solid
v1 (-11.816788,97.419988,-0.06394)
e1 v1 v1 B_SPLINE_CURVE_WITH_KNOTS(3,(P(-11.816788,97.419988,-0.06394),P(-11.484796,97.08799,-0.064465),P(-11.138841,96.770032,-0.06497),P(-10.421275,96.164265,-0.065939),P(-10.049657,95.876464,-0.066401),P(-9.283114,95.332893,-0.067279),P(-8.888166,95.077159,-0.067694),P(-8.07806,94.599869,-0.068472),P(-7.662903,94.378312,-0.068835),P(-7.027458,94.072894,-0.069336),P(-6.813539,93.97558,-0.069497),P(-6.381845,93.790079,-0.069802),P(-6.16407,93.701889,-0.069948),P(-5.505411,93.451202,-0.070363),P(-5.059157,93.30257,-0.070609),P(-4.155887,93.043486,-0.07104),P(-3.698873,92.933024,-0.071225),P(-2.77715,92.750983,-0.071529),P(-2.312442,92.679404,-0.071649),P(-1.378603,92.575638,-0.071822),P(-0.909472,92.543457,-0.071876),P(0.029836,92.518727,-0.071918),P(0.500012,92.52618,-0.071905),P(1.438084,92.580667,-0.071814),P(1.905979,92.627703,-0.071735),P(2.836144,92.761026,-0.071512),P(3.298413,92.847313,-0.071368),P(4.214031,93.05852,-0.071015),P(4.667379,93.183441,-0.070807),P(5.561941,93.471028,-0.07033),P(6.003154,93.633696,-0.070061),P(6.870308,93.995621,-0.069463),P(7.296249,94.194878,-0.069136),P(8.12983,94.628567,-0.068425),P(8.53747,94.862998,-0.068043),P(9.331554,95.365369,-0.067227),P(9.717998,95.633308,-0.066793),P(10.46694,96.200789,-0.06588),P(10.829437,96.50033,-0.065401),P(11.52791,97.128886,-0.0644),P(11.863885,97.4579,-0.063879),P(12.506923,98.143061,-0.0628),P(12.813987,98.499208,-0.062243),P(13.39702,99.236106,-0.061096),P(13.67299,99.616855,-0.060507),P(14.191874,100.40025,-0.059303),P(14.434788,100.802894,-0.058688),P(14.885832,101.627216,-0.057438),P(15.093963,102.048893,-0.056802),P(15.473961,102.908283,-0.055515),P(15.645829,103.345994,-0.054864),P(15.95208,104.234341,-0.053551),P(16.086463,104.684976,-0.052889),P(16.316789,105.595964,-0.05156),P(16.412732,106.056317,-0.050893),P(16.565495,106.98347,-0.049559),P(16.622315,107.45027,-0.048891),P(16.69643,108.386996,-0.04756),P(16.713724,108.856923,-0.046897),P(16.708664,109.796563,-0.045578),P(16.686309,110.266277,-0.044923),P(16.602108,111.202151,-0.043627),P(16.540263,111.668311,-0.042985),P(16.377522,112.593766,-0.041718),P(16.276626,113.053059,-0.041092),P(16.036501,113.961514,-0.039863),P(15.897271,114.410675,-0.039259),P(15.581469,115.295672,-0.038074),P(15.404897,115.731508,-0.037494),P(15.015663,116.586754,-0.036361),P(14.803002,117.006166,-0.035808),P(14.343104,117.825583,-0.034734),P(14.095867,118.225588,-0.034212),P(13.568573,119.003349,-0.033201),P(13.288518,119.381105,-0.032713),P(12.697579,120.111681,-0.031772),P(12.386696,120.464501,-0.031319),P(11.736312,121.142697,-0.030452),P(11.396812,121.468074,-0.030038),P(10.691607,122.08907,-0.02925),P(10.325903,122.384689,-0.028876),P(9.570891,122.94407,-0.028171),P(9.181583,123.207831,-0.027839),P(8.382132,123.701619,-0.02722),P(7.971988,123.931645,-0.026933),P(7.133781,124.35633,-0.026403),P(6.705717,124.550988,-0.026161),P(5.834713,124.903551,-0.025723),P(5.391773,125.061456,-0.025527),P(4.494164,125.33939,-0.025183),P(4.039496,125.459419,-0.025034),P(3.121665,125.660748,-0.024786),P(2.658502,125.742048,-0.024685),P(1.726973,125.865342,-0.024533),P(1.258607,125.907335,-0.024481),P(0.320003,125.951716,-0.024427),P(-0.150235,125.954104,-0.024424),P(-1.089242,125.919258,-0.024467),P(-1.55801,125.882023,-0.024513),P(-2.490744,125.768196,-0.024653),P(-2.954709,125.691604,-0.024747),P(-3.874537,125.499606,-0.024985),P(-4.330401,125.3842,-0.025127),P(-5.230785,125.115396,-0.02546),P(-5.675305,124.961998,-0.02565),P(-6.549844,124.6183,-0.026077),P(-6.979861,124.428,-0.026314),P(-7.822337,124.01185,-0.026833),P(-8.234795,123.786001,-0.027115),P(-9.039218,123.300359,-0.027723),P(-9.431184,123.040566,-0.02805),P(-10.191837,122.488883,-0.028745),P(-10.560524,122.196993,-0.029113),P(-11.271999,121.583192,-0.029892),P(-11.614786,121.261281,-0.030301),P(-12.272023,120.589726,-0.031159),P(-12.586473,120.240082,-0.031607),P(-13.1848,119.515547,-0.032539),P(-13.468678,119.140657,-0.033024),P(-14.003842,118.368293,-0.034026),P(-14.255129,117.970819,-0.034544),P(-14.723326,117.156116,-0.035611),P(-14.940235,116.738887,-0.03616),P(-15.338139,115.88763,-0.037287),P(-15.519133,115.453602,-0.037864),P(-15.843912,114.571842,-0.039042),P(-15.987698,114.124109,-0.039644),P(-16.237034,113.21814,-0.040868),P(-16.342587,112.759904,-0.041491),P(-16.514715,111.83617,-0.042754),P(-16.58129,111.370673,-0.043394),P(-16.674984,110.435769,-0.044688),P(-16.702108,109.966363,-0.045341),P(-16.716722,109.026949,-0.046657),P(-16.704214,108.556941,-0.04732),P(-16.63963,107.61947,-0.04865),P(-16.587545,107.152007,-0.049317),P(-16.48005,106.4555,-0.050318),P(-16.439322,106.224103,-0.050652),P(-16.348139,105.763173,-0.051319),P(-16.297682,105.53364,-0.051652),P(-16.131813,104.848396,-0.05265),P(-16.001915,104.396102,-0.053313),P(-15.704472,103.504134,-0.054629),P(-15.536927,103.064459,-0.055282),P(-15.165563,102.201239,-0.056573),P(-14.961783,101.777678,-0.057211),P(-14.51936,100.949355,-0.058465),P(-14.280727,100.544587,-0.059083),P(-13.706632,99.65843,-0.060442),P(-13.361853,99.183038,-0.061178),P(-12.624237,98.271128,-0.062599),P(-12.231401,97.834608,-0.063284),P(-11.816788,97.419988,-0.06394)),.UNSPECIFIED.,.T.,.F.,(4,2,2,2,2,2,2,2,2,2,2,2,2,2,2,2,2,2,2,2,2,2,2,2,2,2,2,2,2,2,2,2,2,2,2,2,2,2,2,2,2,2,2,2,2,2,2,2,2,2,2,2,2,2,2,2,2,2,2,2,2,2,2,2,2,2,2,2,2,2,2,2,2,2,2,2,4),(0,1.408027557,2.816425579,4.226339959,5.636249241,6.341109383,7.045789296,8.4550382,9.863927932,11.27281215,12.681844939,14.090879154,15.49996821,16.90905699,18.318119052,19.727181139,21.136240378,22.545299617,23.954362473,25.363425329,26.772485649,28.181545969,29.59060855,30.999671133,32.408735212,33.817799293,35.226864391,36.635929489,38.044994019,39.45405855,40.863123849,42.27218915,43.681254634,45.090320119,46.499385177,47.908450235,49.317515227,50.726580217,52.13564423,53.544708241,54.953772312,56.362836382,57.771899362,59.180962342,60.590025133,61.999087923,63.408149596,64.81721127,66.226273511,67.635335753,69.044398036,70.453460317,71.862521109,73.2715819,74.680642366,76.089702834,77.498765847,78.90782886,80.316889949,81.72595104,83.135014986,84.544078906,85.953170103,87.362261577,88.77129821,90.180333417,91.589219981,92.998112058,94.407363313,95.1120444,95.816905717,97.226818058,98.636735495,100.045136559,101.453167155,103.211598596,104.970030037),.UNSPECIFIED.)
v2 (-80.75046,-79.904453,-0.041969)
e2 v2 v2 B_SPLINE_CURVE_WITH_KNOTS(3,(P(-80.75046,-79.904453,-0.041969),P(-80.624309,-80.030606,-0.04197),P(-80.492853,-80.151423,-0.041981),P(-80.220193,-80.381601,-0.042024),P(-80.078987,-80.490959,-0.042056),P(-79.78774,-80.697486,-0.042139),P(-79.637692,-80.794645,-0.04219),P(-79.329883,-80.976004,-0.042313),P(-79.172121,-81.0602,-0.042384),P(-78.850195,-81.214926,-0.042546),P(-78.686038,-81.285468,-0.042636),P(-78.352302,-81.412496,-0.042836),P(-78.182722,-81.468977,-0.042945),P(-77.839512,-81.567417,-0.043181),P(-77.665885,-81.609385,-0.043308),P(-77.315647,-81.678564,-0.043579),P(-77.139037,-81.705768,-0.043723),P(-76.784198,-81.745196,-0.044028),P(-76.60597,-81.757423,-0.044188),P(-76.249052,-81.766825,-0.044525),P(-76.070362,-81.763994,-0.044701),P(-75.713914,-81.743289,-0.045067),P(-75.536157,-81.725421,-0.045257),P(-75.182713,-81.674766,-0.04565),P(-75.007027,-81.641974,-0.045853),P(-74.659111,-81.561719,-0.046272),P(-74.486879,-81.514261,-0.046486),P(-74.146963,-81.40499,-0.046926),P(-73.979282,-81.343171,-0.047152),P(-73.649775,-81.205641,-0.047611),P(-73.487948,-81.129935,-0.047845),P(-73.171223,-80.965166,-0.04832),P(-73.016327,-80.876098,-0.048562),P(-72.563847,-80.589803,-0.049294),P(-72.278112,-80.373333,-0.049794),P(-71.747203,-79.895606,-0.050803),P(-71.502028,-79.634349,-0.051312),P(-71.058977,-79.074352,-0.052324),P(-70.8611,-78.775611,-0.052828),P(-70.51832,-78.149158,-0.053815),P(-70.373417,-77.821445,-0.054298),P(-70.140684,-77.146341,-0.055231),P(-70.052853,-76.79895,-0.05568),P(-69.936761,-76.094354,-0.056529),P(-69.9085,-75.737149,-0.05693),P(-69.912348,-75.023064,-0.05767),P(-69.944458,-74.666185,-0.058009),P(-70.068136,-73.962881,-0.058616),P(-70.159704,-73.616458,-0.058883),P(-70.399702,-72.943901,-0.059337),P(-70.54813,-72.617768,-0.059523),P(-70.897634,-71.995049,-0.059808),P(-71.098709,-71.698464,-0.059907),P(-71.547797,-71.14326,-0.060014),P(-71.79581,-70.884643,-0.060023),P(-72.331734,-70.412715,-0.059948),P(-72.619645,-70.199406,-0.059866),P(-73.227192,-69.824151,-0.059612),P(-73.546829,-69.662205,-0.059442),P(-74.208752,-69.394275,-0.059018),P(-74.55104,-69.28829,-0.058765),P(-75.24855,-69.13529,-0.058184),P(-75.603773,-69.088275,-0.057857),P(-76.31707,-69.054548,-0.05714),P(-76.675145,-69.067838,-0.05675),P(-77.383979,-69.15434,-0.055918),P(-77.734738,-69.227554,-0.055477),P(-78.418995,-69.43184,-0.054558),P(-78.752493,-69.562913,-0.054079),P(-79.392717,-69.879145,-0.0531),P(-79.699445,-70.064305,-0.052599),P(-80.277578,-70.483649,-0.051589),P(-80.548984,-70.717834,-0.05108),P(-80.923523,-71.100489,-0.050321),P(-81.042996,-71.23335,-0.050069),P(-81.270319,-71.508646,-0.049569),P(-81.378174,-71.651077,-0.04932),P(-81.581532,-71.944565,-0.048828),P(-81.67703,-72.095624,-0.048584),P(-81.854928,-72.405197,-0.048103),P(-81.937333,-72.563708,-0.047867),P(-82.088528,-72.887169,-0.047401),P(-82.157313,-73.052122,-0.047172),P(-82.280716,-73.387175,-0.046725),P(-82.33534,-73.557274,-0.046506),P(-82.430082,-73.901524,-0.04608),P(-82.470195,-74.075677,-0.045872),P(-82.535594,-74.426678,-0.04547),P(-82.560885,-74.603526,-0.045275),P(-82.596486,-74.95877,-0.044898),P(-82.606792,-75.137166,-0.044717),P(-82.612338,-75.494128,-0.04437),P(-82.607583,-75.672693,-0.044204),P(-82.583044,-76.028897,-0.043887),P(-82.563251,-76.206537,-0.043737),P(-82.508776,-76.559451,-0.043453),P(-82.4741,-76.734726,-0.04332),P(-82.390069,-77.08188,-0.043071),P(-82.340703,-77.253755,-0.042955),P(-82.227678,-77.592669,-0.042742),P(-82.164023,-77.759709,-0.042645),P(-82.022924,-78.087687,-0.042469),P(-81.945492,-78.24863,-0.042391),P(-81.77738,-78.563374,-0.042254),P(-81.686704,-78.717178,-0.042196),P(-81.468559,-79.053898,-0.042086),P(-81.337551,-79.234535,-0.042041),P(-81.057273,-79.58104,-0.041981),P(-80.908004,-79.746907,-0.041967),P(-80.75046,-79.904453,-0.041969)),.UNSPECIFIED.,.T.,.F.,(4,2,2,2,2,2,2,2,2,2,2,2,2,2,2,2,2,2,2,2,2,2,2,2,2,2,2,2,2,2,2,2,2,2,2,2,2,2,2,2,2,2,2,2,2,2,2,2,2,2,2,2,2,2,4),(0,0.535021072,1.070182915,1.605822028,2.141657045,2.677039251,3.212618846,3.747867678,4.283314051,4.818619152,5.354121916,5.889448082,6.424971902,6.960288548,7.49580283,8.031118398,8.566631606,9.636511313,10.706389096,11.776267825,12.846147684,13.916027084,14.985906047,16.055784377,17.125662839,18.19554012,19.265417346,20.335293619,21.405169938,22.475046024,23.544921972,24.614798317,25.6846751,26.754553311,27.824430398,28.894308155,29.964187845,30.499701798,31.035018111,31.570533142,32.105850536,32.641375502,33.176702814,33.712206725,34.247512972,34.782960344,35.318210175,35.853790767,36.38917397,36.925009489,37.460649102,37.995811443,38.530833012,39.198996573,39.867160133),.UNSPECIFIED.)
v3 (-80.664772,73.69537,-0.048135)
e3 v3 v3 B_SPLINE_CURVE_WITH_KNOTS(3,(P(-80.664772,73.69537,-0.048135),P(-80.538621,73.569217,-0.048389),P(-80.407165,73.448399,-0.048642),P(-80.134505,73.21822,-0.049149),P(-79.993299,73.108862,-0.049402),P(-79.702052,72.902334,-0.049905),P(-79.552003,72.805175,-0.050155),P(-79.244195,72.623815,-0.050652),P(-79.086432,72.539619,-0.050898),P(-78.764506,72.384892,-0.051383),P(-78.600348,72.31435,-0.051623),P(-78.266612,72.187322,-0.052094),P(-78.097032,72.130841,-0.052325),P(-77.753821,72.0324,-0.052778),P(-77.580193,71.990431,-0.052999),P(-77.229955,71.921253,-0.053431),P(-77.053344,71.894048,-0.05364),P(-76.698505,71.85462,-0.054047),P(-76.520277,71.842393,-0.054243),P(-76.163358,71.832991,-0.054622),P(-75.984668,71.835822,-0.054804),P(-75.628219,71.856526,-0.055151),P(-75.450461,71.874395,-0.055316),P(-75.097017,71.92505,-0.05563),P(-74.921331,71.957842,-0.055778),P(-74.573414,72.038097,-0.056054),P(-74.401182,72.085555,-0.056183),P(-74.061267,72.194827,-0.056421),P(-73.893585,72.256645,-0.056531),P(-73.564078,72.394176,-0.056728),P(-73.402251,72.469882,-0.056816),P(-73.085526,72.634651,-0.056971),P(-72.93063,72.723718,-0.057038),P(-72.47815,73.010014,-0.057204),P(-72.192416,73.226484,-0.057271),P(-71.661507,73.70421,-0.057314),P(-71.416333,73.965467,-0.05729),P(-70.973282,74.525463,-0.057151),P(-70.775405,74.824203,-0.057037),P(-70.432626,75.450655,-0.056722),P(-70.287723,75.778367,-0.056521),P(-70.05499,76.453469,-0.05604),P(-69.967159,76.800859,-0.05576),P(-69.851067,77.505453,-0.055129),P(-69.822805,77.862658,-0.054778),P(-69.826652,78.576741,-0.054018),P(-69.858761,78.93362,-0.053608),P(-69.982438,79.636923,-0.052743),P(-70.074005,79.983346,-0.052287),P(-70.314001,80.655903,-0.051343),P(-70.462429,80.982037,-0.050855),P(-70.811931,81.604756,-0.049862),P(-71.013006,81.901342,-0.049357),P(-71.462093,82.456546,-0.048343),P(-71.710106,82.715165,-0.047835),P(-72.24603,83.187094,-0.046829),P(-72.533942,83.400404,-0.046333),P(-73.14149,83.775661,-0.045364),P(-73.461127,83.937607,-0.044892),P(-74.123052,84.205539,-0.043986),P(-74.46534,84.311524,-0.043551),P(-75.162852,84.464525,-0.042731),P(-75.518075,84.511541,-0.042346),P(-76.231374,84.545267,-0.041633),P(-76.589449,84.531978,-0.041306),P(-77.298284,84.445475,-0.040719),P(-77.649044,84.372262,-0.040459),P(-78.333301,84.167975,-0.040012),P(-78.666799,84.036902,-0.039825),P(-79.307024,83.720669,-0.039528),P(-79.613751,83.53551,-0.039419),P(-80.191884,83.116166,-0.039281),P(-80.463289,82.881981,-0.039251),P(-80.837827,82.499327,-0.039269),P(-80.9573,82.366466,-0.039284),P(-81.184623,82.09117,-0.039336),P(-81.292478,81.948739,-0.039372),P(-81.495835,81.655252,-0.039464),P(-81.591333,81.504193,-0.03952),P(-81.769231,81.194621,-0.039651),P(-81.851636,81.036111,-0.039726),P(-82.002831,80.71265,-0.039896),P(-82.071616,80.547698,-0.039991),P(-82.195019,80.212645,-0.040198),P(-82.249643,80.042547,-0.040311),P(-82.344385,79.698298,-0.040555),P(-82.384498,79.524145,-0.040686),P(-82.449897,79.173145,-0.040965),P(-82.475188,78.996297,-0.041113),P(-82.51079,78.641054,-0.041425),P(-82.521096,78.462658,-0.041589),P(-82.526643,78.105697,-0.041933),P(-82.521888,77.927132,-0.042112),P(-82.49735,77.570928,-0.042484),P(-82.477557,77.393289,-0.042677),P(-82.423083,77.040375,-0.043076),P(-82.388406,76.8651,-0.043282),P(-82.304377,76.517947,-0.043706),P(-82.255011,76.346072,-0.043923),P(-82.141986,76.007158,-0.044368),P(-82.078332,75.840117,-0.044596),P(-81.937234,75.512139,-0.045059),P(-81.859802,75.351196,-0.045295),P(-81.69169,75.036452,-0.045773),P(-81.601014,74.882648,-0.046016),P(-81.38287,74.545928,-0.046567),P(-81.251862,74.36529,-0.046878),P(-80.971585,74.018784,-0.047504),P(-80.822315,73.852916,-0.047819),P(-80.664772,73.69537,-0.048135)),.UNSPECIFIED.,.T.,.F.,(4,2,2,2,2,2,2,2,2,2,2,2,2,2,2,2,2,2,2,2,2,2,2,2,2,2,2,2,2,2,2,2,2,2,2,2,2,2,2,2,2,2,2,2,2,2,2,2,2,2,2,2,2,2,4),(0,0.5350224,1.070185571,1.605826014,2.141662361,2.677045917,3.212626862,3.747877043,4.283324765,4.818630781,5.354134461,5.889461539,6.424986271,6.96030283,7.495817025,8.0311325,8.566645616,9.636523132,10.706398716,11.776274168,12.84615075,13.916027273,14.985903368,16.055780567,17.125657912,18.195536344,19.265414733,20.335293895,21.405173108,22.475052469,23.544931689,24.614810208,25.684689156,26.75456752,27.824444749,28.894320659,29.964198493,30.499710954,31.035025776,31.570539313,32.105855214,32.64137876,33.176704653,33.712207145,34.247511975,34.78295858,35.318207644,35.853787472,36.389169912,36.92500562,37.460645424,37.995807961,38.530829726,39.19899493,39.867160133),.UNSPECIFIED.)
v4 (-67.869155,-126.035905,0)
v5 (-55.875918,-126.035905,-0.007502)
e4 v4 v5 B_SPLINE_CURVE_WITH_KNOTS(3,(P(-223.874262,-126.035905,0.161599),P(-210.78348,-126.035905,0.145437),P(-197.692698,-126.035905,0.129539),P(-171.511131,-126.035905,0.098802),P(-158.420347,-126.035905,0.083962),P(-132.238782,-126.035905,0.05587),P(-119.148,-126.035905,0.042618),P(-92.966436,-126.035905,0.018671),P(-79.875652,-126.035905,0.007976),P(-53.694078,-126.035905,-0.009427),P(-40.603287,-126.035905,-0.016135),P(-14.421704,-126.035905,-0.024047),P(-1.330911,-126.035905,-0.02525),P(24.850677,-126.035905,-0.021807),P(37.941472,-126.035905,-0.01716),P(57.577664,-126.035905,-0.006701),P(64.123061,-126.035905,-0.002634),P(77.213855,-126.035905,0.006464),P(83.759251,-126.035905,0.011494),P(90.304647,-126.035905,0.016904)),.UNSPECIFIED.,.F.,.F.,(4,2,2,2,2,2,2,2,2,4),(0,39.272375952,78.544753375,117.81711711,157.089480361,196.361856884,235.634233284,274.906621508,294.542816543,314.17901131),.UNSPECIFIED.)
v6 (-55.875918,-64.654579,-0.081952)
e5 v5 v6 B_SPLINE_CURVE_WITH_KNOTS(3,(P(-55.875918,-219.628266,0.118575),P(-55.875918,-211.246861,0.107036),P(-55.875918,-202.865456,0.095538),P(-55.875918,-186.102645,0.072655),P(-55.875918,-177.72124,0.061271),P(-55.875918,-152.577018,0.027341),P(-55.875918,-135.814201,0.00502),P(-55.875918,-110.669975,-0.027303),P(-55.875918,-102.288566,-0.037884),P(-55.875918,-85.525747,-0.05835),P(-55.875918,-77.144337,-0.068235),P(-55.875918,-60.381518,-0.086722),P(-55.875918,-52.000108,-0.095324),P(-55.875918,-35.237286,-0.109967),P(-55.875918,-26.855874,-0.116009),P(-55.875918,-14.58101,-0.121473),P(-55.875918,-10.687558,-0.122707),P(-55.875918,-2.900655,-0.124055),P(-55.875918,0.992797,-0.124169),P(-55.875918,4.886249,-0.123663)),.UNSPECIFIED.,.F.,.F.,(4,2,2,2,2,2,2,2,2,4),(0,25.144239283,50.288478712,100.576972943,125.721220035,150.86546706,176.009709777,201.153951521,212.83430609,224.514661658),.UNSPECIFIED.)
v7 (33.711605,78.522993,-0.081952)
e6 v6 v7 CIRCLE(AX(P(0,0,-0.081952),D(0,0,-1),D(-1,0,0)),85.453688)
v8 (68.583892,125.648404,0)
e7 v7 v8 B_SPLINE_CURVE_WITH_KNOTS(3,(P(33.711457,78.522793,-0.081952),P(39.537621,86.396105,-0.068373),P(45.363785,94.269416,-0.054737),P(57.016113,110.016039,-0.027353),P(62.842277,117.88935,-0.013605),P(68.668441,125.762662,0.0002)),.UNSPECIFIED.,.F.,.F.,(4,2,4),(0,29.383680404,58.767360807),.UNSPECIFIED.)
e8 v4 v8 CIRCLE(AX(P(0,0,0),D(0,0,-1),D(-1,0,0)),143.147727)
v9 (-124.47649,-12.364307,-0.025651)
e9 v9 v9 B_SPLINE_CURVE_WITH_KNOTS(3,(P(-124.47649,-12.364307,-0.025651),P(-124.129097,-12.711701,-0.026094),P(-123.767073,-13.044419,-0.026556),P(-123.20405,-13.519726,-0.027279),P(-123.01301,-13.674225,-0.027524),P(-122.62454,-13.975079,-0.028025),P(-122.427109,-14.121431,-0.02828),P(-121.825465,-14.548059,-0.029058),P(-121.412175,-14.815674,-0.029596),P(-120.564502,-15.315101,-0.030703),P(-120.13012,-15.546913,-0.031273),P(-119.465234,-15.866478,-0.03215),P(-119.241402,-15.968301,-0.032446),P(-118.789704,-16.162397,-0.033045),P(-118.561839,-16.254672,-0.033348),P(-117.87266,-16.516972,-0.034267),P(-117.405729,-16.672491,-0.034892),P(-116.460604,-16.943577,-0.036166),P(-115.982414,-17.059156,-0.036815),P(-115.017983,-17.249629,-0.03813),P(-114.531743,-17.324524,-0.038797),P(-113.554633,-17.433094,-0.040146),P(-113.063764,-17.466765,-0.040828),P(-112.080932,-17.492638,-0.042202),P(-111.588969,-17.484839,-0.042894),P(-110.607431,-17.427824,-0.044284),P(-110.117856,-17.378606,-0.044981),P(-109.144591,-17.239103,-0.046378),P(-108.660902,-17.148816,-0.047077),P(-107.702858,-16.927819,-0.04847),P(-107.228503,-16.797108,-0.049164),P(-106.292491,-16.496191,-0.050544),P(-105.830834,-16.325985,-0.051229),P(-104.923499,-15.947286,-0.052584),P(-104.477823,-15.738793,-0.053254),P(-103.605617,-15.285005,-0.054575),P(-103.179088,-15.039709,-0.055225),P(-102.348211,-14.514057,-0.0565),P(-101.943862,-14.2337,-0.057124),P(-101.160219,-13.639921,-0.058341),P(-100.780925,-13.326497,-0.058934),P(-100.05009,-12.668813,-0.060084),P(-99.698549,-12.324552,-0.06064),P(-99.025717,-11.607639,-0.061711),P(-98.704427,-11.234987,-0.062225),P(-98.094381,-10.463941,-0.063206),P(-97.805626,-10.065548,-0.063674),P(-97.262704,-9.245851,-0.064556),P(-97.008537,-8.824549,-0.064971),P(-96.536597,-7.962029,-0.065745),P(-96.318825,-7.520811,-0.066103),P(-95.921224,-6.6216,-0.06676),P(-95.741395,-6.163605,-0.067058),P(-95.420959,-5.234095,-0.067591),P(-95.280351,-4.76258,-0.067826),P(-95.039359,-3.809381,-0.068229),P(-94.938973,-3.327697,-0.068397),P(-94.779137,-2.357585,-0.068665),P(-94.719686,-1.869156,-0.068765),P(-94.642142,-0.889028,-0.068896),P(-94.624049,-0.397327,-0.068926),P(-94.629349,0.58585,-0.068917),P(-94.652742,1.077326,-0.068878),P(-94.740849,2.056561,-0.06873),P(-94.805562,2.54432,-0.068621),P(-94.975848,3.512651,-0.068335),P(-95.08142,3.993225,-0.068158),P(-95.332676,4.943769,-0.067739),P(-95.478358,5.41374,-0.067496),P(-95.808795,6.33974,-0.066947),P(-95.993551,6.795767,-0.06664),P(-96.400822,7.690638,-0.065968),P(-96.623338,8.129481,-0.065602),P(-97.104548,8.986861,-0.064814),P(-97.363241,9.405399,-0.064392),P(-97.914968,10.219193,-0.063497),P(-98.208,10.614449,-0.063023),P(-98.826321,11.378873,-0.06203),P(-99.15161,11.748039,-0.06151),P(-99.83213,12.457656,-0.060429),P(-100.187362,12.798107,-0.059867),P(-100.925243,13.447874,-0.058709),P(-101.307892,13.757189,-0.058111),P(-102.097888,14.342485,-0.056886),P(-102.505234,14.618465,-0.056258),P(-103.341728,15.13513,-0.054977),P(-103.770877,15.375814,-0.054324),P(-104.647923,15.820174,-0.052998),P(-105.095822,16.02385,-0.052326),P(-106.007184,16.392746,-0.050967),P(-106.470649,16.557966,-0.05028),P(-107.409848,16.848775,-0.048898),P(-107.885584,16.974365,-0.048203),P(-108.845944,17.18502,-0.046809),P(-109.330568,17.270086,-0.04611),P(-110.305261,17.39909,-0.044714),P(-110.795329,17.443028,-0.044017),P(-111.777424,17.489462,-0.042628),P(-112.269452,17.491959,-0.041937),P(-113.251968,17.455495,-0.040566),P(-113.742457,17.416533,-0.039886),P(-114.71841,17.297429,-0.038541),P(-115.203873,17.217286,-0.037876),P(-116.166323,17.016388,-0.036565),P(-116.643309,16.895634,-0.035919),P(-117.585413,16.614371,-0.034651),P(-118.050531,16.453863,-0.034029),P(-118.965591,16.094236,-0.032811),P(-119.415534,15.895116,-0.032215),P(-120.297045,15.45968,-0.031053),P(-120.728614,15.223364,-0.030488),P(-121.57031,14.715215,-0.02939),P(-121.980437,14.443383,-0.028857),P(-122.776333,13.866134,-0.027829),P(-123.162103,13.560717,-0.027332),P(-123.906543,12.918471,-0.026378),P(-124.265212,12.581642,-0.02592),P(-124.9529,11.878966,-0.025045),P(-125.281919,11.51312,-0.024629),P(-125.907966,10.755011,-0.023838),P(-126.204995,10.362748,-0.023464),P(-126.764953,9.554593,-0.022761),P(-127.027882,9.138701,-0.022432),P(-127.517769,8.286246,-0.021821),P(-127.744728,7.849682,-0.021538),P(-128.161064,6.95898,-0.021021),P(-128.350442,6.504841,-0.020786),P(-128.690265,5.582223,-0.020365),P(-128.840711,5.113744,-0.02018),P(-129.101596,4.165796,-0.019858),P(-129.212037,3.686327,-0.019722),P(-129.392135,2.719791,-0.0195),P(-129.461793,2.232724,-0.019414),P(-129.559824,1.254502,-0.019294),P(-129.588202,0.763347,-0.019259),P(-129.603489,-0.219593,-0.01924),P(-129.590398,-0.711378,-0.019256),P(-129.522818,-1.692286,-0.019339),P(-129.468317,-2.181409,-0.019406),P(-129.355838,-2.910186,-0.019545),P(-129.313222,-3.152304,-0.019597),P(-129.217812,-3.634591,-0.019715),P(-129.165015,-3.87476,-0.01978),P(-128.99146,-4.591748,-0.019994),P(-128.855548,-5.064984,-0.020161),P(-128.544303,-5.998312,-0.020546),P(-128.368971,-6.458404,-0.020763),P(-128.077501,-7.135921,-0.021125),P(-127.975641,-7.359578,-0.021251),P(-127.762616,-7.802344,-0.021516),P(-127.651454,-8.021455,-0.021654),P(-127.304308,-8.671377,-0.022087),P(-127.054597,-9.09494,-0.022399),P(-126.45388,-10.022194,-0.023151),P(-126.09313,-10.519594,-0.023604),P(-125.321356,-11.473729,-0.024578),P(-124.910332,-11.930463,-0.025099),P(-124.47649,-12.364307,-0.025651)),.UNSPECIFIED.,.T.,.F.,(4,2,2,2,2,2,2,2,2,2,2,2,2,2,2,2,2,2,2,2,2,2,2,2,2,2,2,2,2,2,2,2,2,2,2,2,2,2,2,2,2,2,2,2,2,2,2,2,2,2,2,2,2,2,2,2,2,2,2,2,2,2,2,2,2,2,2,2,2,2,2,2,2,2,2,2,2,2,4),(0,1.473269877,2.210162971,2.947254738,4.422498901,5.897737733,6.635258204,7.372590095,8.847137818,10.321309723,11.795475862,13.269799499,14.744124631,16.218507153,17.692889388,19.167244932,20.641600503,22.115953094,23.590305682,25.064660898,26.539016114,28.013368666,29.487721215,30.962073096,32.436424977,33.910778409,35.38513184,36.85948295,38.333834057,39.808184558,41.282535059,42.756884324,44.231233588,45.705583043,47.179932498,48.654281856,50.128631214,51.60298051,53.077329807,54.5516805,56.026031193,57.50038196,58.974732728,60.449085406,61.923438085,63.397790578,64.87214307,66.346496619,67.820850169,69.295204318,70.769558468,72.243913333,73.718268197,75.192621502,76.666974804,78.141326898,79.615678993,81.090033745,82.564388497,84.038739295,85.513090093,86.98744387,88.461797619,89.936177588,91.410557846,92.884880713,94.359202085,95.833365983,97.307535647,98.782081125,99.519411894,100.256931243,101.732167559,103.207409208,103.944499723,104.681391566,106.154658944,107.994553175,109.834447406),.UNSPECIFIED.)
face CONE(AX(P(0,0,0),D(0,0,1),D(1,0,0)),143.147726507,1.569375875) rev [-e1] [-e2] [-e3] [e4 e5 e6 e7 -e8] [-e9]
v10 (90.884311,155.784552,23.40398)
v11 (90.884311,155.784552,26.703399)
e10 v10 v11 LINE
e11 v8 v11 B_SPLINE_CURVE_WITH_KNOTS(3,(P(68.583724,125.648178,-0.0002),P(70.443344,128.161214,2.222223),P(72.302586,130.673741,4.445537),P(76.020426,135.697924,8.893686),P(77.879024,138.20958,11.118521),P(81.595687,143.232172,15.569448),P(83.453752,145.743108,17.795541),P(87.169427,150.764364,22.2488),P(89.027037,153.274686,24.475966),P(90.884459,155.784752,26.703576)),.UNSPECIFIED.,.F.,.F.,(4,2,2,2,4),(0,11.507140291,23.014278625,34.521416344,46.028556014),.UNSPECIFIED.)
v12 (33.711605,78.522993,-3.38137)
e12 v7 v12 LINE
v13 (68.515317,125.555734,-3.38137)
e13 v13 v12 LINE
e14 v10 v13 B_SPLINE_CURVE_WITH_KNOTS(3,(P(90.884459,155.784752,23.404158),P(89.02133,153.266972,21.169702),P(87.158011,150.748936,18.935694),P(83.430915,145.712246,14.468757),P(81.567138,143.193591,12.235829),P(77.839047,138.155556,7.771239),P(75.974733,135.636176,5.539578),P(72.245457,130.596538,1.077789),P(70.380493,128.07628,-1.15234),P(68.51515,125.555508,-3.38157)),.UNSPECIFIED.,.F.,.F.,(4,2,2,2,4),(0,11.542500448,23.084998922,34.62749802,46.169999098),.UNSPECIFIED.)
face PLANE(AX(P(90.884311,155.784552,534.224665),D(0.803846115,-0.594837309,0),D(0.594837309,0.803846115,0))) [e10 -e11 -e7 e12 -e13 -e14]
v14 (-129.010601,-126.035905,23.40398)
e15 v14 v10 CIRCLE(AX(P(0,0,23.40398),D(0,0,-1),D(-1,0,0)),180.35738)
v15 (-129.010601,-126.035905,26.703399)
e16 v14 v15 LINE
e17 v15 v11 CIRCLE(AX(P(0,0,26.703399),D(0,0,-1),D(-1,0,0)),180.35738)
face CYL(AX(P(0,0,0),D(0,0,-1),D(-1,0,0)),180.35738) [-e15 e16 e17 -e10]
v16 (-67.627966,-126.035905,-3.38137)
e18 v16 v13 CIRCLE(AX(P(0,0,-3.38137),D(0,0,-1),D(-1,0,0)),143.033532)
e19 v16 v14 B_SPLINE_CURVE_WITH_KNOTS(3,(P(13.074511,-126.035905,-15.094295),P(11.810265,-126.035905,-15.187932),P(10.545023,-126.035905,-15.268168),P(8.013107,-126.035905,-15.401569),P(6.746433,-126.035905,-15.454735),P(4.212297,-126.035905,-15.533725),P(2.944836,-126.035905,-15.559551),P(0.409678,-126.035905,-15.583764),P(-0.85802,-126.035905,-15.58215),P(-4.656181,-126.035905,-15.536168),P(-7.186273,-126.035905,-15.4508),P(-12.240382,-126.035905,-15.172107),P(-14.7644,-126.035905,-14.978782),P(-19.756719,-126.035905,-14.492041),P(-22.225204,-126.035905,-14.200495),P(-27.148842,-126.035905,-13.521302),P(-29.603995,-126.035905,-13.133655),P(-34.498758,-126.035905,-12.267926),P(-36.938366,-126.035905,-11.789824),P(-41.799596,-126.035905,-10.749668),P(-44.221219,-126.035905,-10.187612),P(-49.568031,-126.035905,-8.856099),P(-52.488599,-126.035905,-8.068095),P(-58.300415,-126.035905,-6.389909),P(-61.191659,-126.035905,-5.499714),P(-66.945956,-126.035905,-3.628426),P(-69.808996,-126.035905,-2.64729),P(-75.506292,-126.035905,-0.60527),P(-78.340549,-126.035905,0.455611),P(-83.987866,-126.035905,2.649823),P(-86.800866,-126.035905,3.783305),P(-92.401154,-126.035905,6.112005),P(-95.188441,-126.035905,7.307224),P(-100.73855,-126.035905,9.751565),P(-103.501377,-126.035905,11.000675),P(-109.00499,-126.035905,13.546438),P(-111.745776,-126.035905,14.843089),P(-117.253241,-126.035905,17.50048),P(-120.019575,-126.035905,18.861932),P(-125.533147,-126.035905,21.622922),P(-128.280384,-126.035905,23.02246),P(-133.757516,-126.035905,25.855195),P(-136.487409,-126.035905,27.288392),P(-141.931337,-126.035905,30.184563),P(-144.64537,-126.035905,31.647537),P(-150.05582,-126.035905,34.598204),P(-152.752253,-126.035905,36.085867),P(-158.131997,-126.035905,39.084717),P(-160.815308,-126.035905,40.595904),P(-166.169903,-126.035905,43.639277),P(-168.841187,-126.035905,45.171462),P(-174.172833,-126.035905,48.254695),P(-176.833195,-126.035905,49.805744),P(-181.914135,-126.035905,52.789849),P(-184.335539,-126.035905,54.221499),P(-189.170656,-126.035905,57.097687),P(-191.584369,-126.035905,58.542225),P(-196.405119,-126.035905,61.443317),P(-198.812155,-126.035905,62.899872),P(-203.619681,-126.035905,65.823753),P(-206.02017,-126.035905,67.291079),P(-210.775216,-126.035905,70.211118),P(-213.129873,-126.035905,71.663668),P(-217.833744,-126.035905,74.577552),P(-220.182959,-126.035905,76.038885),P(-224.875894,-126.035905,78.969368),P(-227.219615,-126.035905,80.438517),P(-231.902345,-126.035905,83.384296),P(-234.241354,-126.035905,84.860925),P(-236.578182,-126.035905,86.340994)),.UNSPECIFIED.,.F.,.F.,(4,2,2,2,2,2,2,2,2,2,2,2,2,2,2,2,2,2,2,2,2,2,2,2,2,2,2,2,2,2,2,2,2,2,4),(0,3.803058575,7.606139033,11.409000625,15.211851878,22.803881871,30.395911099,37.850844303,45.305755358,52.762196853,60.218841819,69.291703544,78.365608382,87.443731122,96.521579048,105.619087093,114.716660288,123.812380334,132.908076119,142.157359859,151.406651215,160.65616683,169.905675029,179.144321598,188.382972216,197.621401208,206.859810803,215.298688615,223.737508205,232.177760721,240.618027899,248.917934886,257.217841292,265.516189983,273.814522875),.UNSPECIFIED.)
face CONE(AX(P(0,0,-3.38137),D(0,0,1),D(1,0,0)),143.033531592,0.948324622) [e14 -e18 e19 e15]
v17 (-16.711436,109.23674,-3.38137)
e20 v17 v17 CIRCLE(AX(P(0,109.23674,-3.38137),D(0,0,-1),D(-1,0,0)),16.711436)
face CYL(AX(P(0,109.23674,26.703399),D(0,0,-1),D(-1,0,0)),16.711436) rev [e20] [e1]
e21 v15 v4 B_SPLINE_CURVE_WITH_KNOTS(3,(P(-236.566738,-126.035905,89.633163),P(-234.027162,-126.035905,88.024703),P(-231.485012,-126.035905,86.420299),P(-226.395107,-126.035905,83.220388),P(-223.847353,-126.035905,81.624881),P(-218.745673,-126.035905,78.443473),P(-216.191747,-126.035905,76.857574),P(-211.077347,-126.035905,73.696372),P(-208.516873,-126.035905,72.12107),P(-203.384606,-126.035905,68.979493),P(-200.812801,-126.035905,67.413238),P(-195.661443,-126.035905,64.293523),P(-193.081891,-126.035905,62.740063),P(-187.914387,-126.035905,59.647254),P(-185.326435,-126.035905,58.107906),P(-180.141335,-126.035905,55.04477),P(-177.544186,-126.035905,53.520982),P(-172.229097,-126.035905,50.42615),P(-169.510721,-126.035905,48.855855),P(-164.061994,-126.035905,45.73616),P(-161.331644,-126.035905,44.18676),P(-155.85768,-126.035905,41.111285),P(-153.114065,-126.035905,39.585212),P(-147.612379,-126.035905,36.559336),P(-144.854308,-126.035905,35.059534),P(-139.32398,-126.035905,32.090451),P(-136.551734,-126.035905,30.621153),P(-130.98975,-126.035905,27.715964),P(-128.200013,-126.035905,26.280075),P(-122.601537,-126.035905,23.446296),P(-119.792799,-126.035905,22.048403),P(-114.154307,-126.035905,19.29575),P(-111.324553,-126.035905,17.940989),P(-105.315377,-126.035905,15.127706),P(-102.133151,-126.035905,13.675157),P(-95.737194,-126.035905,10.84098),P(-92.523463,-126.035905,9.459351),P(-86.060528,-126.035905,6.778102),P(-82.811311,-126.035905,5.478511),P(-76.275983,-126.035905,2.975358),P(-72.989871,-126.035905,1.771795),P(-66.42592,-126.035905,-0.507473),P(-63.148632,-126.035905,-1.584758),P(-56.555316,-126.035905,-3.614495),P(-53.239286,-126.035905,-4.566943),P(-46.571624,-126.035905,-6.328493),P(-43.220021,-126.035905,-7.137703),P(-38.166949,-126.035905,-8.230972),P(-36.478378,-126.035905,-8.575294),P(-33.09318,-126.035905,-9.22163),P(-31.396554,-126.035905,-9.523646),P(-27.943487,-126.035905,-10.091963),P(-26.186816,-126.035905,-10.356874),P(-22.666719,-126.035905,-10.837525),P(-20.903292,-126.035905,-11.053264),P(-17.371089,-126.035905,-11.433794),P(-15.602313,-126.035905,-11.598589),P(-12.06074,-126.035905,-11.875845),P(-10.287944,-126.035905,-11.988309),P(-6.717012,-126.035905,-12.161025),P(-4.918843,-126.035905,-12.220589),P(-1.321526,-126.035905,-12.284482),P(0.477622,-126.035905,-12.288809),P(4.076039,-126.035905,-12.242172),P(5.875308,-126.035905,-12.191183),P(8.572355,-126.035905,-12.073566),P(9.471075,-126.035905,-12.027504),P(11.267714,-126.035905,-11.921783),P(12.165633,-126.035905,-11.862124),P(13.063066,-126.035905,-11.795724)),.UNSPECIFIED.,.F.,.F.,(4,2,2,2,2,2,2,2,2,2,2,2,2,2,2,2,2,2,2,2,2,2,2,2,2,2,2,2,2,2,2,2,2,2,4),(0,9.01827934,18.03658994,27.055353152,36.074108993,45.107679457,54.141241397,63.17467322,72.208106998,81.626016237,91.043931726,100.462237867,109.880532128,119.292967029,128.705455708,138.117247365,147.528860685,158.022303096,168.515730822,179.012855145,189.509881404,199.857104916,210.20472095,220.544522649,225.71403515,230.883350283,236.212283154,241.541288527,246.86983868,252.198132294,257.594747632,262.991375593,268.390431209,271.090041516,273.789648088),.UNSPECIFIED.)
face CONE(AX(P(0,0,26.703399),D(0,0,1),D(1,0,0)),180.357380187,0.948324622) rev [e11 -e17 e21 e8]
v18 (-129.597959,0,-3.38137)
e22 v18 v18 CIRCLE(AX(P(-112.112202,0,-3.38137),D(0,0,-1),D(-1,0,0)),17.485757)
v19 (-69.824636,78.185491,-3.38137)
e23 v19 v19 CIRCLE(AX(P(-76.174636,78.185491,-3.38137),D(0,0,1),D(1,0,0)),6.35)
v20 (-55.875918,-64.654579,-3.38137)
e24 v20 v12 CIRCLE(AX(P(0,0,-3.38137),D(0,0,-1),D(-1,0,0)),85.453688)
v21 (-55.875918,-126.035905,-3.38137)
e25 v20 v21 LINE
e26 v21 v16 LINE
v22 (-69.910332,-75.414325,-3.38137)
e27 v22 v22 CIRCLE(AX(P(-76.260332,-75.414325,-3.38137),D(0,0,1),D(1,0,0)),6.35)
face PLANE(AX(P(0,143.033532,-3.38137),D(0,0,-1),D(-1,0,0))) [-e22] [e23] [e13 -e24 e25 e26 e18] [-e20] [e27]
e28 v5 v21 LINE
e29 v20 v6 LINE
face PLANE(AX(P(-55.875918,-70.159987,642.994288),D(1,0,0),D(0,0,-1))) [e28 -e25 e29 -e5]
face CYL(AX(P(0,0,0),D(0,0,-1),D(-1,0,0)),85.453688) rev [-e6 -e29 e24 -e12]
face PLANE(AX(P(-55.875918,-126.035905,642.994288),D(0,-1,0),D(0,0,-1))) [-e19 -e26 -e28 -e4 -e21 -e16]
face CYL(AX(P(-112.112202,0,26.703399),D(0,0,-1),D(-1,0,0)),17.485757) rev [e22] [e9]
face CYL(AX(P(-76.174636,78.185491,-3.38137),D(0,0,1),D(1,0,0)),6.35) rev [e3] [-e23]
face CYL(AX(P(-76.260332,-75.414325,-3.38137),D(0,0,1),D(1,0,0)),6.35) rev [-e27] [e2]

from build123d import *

# Parameters (mm, degrees)
CUT_EXTRUDE1_DEPTH      = 257.457873087
CUT_EXTRUDE1_DEPTH_BACK = 257.457873087
SKETCH5_R               = 6.35
CUT_EXTRUDE4_DEPTH      = 257.457873098
SKETCH6_R               = 16.711436386
SKETCH6_R_2             = 17.485757022
CUT_EXTRUDE5_DEPTH      = 257.83197321
SKETCH7_W               = 38.686396819
SKETCH7_H               = 81.826205817
CUT_EXTRUDE6_DEPTH      = 257.457873098
CUT_EXTRUDE7_DEPTH      = 257.457873098
CUT_EXTRUDE7_DEPTH_BACK = 257.457873098
CUT_EXTRUDE8_START      = -3.381369738
CUT_EXTRUDE8_DEPTH      = 30.084768361


# Read off the part's stored shape, not the designer's step: Cut-Extrude8
with BuildPart() as part:
    # Sweep2: sweep along a path in Sketch1
    with BuildLine(Plane.XY) as sweep2_path:
        CenterArc((0, 0), 139.7, 0, 360)
    # Sketch2 → Sweep2 (sweep)
    with BuildSketch(Plane(origin=(0, 0, 0), x_dir=(0, 0, -1), z_dir=(1, 0, 0))):
        Polygon((0.081951645, 85.453687679), (0, 143.147726507), (-26.703398523, 180.357380187), (-23.40398043, 180.357380187), (3.381369738, 143.033531592), (3.381369738, 85.453687679), align=None)
    sweep(path=sweep2_path.line)

    # Sketch3 → Cut-Extrude1 (cut, two sides: drawn at the far end of the back side and taken through both)
    with BuildSketch(Plane.XY.offset(-CUT_EXTRUDE1_DEPTH_BACK)):
        Polygon((821.723604832, 900.839301856), (152.923564845, 137.799256234), (60.497234444, 32.34921564), (-41.171728997, -70.159987168), (-55.875917924, -70.159987168), (-55.875917924, -126.035905092), (-167.627753772, -126.035905092), (-167.627753772, -181.911823016), (-167.627753772, -1196.566249267), (1667.740204928, -2062.313830848), (2657.091563532, 35.091720274), align=None)
    extrude(amount=CUT_EXTRUDE1_DEPTH + CUT_EXTRUDE1_DEPTH_BACK, mode=Mode.SUBTRACT)

    # Sketch5 → Cut-Extrude4 (cut, through all)
    with BuildSketch(Plane.XY):
        with Locations((-76.174636448, 78.185490602)):
            Circle(SKETCH5_R)
        with Locations((-76.260331952, -75.414325116)):
            Circle(SKETCH5_R)
    extrude(amount=-CUT_EXTRUDE4_DEPTH, mode=Mode.SUBTRACT)

    # Sketch6 → Cut-Extrude5 (cut, through all)
    with BuildSketch(Plane(origin=(0, 0, -3.381369738), x_dir=(-1, 0, 0), z_dir=(0, 0, -1))):
        with Locations((0, 109.236739893)):
            Circle(SKETCH6_R)
        with Locations((112.112202079, 0)):
            Circle(SKETCH6_R_2)
    extrude(amount=-CUT_EXTRUDE5_DEPTH, mode=Mode.SUBTRACT)

    # Sketch7 → Cut-Extrude6 (cut, through all)
    with BuildSketch(Plane.XY):
        with Locations((-36.532719515, -85.122802183)):
            Rectangle(SKETCH7_W, SKETCH7_H)
    extrude(amount=-CUT_EXTRUDE6_DEPTH, mode=Mode.SUBTRACT)

    # Sketch8 → Cut-Extrude7 (cut, two sides: drawn at the far end of the back side and taken through both)
    with BuildSketch(Plane.XY.offset(-CUT_EXTRUDE7_DEPTH_BACK)):
        with BuildLine():
            Line((517.613905497, -613.797286977), (111.177648296, 90.170960534))
            Line((111.177648296, 90.170960534), (95.308152083, 117.657734266))
            ThreePointArc((95.308152083, 117.657734266), (92.009440132, 125.621529396), (90.884310916, 134.167734266))
            Line((90.884310916, 134.167734266), (90.884310916, 169.901611192))
            Line((90.884310916, 169.901611192), (90.884310916, 982.774125595))
            Line((90.884310916, 982.774125595), (1661.496369245, 1402.565336698))
            Line((1661.496369245, 1402.565336698), (2088.225963826, -194.006075874))
            Line((2088.225963826, -194.006075874), (517.613905497, -613.797286977))
        make_face()
    extrude(amount=CUT_EXTRUDE7_DEPTH + CUT_EXTRUDE7_DEPTH_BACK, mode=Mode.SUBTRACT)

    # Cut-Extrude8 outline → Cut-Extrude8 (cut)
    with BuildSketch(Plane.XY.offset(CUT_EXTRUDE8_START)):
        with BuildLine():
            Line((90.884310916, 155.784551921), (33.711604752, 78.522993084))
            ThreePointArc((33.711604752, 78.522993084), (55.441528266, 65.02745329), (72.203661887, 45.705185132))
            Line((72.203661887, 45.705185132), (111.177648296, 90.170960534))
            Line((111.177648296, 90.170960534), (95.308152083, 117.657734266))
            ThreePointArc((95.308152083, 117.657734266), (92.009440132, 125.621529397), (90.884310916, 134.167734266))
            Line((90.884310916, 134.167734266), (90.884310916, 155.784551921))
        make_face()
    extrude(amount=CUT_EXTRUDE8_DEPTH, mode=Mode.SUBTRACT)


solid = part.part
